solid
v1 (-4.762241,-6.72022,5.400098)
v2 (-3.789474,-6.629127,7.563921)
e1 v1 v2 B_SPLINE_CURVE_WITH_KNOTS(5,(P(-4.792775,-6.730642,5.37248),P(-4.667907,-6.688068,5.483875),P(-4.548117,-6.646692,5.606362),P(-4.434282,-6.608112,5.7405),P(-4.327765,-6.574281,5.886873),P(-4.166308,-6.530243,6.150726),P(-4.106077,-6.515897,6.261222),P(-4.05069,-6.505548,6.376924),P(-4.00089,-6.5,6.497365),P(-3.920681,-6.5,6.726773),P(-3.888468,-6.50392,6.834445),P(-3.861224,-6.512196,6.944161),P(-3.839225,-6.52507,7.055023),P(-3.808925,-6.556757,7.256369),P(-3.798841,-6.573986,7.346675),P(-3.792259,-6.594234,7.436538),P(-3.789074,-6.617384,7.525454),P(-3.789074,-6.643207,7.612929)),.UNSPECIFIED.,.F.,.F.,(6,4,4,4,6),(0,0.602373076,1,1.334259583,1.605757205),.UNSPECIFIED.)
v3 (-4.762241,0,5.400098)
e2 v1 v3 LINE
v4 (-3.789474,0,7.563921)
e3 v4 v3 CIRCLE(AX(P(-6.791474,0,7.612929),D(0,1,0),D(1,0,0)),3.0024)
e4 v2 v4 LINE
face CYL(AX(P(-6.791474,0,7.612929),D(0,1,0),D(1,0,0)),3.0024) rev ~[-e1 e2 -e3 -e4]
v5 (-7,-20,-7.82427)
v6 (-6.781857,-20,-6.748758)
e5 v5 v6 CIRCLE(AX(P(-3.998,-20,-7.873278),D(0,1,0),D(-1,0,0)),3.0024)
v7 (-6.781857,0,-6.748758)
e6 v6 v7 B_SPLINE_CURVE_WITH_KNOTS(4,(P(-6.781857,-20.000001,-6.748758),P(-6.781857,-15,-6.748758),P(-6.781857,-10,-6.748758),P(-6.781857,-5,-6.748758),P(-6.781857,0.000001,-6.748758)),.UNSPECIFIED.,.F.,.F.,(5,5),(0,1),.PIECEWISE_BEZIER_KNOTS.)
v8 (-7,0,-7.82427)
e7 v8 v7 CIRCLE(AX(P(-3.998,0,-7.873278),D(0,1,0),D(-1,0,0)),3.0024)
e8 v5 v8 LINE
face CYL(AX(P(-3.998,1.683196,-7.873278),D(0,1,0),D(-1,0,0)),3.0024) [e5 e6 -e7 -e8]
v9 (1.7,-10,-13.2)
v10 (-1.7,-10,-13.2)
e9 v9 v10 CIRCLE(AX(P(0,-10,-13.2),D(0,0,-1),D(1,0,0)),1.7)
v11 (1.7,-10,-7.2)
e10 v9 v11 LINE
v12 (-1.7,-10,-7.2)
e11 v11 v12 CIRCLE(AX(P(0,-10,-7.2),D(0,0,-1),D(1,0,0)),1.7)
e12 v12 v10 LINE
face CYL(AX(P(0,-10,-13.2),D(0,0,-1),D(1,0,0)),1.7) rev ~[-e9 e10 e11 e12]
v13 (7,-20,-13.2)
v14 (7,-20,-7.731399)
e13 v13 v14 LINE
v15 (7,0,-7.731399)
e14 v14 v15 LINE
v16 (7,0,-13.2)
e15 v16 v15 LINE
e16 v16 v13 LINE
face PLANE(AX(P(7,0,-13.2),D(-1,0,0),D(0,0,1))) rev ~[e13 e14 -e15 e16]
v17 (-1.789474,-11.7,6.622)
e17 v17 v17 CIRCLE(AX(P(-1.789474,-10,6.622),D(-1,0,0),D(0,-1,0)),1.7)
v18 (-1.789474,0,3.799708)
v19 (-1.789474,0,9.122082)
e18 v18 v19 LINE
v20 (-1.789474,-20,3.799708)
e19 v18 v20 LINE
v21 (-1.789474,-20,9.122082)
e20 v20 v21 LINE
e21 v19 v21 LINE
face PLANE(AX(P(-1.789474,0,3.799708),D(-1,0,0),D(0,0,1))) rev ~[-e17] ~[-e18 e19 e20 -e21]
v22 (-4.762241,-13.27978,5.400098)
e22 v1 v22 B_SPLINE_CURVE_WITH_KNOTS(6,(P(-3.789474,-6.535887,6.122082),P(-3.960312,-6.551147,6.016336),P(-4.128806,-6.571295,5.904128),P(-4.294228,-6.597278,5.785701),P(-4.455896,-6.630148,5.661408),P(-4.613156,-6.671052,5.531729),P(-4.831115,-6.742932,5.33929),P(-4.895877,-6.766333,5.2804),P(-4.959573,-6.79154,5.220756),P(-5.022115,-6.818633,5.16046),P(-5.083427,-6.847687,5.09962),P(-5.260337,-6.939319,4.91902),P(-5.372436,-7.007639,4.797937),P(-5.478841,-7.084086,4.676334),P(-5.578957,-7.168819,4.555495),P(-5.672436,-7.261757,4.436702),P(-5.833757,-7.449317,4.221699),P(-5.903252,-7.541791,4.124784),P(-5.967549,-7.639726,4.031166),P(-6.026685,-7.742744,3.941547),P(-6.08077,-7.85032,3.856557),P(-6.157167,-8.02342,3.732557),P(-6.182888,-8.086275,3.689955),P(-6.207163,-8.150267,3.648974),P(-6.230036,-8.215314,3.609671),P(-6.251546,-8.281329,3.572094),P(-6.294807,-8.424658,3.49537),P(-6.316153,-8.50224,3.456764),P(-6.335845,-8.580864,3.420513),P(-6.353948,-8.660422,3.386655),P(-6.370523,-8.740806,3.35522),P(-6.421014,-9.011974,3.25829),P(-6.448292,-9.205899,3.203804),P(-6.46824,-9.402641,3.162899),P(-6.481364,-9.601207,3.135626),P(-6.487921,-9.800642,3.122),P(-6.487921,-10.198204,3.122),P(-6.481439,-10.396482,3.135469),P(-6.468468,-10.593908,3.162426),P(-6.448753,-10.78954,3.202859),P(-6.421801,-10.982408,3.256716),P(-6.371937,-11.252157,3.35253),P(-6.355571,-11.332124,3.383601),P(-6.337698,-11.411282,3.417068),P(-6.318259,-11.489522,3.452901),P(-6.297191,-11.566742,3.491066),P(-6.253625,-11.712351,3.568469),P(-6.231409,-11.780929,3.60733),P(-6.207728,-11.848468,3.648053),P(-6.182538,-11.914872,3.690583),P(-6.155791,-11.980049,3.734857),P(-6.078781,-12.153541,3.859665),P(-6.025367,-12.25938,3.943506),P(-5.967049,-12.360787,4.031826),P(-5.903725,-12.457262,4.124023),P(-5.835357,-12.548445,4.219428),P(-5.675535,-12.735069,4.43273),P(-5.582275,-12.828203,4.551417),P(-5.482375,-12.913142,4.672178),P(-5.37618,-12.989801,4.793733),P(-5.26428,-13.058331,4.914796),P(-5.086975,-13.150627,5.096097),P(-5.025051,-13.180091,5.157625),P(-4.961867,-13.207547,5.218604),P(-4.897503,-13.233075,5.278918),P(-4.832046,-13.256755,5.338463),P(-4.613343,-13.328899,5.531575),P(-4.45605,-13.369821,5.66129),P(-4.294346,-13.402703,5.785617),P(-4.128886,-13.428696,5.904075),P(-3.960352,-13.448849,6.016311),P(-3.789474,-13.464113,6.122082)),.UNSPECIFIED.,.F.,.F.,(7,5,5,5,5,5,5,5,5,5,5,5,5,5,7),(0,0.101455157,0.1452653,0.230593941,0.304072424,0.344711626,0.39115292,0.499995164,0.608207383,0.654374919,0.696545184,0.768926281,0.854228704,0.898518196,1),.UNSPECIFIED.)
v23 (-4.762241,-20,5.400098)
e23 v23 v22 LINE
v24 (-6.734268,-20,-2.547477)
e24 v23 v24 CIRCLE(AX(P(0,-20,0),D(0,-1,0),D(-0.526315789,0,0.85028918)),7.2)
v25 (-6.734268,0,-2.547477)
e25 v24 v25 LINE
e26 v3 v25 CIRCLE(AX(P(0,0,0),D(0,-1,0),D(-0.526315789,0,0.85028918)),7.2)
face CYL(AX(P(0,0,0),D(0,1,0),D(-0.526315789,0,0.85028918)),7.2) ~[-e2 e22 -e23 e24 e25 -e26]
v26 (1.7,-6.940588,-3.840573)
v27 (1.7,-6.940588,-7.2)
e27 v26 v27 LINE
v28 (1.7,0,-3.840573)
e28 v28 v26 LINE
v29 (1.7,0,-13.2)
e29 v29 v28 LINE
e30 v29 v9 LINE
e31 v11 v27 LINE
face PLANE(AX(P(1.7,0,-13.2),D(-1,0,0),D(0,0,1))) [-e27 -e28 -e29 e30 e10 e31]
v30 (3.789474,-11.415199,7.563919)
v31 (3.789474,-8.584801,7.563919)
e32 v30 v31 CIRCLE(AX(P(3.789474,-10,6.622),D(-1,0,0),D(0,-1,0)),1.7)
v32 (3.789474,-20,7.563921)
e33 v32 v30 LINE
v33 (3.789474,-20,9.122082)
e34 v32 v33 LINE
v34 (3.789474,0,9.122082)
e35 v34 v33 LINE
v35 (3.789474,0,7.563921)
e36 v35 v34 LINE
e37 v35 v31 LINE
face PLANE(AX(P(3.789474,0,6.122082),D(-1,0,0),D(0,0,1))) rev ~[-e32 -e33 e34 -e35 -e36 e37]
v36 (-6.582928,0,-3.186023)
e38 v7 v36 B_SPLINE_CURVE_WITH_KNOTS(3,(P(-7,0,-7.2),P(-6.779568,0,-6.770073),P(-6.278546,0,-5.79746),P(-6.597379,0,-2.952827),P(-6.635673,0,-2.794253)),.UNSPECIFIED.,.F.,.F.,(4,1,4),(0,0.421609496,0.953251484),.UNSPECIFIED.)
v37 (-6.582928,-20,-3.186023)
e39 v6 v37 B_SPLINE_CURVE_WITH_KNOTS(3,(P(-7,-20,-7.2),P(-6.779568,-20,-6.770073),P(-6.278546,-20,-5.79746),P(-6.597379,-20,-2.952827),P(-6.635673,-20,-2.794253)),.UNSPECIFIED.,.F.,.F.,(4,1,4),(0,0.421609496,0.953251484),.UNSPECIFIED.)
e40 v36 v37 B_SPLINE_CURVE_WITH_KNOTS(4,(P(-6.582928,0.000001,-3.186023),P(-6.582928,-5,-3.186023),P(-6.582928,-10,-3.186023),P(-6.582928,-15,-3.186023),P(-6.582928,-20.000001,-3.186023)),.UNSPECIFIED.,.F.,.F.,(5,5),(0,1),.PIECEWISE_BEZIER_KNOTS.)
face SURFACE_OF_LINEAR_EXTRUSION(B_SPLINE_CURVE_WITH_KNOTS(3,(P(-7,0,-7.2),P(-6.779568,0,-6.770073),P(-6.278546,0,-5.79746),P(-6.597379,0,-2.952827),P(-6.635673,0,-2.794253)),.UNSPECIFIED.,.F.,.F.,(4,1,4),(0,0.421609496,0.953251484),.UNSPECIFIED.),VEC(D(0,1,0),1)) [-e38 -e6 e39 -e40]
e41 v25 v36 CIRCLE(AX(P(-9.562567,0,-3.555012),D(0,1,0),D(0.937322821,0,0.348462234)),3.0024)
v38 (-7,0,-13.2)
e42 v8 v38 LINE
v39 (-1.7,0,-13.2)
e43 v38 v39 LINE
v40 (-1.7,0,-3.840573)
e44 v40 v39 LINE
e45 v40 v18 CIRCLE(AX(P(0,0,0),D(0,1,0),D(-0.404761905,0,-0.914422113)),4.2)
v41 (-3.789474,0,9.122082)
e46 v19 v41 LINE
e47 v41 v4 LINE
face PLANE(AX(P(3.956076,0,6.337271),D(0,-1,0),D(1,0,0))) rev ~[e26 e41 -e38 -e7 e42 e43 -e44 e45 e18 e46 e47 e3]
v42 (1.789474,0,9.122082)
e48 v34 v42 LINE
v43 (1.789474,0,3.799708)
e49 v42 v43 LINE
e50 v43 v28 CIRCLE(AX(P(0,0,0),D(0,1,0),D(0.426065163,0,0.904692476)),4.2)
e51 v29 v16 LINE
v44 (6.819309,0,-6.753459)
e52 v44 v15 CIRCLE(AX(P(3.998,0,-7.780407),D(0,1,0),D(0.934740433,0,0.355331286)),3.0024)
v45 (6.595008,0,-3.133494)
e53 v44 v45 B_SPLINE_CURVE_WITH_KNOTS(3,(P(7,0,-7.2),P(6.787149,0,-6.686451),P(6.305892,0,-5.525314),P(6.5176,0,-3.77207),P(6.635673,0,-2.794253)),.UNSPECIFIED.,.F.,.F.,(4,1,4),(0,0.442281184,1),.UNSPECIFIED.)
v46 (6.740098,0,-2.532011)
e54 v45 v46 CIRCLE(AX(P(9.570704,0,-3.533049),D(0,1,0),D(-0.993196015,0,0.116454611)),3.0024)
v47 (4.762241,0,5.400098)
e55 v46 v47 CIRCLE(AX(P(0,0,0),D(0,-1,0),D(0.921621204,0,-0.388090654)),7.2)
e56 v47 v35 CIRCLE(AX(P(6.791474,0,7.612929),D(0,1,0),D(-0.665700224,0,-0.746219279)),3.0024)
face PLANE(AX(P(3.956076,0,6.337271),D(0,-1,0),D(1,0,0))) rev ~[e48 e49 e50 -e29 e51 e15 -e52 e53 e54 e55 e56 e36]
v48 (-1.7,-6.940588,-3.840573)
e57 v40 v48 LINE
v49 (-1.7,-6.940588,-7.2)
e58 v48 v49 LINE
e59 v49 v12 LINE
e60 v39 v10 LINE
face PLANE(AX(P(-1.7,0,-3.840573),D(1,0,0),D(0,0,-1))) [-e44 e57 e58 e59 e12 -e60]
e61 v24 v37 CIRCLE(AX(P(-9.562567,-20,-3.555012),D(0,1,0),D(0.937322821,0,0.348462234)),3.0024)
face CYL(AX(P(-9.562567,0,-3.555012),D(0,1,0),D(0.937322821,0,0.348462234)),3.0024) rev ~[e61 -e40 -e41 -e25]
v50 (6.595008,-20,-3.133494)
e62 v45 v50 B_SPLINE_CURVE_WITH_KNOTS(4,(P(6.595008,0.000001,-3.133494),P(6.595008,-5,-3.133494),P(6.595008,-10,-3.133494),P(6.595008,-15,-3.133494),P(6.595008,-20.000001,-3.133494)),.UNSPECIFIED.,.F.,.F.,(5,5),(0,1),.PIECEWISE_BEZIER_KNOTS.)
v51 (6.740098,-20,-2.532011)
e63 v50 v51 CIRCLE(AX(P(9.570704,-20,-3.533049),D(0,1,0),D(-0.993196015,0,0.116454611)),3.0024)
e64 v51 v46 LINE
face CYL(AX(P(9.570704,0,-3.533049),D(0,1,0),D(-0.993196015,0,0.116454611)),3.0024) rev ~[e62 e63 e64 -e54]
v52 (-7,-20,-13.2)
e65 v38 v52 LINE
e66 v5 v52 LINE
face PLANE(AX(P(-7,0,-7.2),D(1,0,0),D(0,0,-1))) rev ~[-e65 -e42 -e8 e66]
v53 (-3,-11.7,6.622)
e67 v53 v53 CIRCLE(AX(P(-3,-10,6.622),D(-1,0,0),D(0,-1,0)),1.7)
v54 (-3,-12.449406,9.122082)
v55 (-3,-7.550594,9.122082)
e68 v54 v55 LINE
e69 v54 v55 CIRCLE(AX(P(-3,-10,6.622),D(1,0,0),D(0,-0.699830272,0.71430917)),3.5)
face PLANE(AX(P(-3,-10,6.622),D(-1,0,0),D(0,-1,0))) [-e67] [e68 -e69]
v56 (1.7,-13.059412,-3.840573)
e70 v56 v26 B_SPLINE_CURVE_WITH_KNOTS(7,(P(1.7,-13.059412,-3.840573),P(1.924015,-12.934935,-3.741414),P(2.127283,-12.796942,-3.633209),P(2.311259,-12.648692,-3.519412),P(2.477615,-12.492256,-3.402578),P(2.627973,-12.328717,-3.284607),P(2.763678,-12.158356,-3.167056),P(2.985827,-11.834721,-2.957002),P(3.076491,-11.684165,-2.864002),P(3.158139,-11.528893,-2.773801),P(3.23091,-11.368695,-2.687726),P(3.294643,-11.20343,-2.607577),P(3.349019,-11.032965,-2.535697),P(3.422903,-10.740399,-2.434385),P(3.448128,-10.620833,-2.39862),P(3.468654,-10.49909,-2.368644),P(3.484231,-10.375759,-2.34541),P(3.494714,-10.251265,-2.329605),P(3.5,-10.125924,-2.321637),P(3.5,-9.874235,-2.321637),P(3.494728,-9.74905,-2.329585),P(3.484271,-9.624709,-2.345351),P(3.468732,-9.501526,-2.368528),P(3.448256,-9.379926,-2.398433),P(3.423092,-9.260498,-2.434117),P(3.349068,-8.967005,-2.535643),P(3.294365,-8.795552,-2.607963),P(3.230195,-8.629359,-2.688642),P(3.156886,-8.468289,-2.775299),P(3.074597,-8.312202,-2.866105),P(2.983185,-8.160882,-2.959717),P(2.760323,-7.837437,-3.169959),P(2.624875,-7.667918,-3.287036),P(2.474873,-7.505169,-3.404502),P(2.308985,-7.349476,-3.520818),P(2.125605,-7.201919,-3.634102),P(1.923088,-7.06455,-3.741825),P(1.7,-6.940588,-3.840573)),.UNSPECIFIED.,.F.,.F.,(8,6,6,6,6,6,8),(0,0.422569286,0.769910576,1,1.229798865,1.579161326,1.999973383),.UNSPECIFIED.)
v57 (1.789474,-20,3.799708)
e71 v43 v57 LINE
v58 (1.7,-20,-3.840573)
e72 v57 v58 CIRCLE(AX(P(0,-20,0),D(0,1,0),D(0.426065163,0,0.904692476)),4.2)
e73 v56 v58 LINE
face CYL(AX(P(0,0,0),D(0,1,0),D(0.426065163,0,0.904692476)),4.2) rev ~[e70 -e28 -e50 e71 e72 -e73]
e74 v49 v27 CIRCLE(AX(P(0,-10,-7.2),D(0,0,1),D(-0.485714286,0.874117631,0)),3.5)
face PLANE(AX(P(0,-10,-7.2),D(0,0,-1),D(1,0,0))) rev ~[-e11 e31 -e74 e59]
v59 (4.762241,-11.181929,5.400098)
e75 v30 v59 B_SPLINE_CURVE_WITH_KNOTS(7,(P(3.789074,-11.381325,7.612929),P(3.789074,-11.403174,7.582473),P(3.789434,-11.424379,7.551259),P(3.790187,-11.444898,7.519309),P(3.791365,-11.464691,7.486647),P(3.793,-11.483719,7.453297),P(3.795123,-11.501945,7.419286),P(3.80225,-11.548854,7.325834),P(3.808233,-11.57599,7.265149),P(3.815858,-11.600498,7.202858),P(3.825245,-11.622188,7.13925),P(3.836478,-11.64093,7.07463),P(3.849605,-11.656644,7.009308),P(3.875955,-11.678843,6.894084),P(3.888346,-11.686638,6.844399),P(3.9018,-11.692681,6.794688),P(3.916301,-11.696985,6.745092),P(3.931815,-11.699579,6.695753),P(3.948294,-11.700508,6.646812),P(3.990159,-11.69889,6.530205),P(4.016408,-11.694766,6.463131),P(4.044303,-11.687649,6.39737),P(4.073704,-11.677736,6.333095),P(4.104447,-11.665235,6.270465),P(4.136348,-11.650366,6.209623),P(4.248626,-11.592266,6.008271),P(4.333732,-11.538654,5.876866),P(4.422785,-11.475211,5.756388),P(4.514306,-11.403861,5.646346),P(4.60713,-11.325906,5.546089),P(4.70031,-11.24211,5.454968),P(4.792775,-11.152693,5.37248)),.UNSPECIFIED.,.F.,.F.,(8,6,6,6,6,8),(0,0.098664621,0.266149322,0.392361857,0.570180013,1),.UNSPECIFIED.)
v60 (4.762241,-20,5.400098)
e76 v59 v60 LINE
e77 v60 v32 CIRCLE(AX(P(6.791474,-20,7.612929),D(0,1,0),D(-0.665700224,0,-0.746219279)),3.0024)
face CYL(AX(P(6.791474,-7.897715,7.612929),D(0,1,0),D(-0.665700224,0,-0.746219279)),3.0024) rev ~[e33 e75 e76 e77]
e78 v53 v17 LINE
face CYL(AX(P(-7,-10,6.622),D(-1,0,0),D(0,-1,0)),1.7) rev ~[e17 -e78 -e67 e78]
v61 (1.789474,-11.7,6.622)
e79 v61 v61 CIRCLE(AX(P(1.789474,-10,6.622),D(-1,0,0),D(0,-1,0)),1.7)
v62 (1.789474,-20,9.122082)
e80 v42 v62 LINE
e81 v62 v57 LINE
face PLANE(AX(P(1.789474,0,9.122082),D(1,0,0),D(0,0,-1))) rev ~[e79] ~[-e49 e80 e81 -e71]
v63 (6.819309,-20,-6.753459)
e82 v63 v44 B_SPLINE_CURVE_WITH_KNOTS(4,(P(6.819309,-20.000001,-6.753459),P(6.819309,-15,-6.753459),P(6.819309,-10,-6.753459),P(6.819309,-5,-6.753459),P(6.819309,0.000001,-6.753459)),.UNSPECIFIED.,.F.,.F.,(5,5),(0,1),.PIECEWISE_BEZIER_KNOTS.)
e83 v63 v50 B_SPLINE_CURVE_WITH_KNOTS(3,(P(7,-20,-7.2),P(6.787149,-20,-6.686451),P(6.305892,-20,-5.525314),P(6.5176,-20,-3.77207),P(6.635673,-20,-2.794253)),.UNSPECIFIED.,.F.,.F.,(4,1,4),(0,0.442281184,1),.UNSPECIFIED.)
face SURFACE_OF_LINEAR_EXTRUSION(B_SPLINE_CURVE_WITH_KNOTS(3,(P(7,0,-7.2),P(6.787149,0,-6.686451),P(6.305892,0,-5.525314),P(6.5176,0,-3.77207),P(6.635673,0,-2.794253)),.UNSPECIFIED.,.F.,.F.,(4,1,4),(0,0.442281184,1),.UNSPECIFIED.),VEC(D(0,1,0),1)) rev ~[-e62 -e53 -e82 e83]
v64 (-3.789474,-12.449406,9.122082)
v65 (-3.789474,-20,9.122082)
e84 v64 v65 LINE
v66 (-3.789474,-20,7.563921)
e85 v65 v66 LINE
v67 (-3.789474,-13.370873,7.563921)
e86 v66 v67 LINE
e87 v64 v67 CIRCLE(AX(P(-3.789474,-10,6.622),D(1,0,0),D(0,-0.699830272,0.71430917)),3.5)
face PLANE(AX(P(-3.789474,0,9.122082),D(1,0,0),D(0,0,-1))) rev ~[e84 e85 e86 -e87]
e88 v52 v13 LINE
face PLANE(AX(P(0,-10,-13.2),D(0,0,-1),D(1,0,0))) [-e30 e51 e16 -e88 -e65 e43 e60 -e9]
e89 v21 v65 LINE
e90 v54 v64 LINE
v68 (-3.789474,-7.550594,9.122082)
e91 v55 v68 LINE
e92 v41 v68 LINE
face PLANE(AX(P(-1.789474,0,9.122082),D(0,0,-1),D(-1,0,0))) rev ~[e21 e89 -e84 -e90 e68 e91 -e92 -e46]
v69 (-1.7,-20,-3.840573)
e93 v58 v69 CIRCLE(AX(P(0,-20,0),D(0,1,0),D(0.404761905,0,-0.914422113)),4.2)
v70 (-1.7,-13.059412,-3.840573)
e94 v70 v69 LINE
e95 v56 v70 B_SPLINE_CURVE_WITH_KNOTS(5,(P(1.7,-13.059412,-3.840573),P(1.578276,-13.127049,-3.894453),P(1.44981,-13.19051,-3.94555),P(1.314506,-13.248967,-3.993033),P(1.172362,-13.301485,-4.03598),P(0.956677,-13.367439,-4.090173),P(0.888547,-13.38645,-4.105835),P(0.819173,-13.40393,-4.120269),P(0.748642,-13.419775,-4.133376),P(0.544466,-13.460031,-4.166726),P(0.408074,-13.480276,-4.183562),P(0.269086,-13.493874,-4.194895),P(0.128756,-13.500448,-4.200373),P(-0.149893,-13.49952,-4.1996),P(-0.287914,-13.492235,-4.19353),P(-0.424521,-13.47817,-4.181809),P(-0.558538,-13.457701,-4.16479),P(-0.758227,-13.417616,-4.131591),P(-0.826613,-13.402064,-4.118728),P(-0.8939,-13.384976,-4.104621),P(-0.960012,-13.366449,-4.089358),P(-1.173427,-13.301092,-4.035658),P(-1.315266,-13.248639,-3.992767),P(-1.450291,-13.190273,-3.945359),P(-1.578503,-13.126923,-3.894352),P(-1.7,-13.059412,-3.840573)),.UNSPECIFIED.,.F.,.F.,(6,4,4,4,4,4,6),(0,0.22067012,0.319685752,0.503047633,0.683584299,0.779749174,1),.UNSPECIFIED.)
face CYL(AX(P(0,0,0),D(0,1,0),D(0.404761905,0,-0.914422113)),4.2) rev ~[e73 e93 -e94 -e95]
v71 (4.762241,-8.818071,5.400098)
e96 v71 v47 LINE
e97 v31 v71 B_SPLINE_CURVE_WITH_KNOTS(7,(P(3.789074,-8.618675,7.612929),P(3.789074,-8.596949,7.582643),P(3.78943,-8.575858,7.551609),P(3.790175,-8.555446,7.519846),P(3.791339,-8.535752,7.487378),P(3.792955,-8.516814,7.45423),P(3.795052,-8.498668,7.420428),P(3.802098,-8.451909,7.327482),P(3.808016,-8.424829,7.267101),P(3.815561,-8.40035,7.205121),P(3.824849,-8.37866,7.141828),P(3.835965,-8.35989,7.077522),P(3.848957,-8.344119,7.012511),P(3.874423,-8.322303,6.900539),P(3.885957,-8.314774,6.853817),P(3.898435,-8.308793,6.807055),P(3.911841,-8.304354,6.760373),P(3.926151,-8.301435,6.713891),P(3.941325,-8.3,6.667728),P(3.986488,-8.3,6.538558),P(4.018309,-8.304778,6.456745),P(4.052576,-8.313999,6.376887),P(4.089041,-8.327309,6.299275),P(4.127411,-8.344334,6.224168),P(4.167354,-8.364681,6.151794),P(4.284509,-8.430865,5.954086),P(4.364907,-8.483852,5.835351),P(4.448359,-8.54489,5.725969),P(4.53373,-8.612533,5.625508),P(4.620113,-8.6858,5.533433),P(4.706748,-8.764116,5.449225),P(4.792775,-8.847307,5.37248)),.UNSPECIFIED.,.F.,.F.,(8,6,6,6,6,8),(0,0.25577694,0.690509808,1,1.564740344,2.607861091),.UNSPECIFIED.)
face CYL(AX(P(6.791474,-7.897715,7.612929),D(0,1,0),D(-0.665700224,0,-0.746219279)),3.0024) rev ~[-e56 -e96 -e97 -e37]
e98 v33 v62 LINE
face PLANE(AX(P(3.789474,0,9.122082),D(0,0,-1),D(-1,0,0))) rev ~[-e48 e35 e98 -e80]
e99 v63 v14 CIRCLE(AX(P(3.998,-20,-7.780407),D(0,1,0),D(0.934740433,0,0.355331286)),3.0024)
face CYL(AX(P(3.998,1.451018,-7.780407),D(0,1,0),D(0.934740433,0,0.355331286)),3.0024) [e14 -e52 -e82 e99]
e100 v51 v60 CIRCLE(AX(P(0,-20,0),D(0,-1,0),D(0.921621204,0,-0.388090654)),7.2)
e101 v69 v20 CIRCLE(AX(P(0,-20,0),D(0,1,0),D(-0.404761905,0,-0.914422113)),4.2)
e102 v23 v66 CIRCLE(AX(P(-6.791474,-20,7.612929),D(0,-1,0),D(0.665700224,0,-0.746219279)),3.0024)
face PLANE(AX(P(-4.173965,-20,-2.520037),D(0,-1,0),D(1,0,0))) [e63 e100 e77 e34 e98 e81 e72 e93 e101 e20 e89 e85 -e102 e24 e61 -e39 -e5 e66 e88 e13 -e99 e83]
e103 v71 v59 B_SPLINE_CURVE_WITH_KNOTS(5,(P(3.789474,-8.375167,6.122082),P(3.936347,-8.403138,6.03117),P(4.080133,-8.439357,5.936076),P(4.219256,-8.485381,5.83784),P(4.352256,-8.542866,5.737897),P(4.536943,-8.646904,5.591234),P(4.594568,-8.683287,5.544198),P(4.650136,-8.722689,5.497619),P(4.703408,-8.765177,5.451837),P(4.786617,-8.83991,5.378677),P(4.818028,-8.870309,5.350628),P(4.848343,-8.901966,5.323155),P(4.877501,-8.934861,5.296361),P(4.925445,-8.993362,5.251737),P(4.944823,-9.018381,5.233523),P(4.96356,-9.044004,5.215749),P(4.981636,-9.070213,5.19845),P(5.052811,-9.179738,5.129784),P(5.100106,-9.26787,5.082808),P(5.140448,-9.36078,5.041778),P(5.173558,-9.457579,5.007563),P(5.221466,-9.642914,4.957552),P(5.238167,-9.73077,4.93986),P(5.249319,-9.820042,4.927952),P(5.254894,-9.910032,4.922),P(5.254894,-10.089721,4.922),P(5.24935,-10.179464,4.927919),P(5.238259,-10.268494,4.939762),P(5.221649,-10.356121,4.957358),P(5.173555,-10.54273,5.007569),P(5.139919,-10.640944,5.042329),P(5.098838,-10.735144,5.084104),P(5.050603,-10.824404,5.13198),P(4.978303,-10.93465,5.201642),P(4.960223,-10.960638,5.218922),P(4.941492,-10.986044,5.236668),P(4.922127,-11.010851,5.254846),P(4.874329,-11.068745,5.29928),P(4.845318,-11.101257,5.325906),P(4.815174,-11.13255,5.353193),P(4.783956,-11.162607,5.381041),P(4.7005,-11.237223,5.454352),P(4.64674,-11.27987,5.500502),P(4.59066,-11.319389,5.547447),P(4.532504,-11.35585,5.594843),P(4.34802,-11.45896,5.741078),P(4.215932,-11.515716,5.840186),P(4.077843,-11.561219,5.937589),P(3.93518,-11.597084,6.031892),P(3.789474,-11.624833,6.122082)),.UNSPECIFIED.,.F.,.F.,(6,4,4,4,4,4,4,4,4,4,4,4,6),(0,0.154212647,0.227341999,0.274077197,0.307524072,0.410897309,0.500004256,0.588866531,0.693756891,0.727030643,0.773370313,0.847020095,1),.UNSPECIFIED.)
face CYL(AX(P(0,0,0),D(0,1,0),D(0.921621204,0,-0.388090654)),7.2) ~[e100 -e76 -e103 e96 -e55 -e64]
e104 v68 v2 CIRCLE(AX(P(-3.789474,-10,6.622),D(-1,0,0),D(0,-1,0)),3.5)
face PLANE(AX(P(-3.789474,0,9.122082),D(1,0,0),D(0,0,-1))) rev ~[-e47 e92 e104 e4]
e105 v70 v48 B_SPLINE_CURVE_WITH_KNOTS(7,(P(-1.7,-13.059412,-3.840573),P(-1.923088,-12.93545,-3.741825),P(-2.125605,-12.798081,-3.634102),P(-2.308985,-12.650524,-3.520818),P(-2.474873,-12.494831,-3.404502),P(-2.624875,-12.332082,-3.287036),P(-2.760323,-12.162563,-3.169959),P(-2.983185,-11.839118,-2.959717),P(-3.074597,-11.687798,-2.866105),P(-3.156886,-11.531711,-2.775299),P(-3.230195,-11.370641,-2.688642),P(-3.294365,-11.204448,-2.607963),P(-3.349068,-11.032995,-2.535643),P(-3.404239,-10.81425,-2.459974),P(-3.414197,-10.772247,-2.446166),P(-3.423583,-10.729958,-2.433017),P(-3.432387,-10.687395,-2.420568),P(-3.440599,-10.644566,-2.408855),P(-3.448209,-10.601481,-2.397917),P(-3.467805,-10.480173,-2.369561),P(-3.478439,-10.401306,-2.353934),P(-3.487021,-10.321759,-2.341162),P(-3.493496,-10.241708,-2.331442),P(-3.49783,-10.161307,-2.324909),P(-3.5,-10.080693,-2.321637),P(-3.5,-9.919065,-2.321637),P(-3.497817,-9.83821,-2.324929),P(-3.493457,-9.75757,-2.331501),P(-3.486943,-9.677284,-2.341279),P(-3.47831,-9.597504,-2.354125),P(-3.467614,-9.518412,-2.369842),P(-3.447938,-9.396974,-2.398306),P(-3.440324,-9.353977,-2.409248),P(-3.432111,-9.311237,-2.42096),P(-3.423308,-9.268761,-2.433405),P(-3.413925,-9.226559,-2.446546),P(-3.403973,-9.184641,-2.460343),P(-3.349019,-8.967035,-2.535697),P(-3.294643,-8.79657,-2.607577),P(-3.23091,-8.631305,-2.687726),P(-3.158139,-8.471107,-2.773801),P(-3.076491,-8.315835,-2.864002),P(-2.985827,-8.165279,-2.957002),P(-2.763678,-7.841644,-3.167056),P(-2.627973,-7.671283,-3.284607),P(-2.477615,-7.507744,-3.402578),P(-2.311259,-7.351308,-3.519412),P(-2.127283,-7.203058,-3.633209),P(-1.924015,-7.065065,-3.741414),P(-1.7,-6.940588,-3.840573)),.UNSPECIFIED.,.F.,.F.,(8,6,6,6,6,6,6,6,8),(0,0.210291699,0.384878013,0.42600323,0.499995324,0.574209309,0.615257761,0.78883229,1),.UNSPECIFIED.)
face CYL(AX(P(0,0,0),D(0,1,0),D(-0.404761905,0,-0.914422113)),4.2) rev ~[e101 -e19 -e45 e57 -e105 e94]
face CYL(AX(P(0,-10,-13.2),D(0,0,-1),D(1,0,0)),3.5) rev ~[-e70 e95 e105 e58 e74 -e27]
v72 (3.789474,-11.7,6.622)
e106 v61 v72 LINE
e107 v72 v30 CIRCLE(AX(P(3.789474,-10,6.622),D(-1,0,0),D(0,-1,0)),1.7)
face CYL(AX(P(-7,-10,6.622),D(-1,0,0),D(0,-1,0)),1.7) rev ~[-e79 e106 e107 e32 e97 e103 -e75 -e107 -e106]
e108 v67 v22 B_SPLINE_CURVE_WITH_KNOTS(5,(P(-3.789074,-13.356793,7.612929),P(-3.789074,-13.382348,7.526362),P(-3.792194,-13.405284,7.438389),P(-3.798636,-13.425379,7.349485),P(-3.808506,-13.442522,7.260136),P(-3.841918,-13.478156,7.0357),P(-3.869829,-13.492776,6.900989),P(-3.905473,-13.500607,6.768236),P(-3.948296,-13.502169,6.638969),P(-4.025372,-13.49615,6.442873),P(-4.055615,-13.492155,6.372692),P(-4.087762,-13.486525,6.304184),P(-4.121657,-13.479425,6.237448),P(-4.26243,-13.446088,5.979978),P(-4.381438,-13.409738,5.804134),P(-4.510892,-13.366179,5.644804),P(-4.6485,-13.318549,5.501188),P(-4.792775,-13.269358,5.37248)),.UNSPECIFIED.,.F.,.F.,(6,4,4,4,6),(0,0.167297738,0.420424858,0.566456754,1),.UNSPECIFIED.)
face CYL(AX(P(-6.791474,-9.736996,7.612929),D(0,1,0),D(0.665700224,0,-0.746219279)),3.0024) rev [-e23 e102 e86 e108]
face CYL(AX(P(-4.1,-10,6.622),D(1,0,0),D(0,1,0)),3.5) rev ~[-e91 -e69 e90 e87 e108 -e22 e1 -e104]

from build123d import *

# Parameters (mm, degrees)
F1_DEPTH     = 20
F2_R         = 3.5
F2_R_2       = 1.7
F3_DEPTH     = 4
F4_DEPTH     = 25
F5_T1_DEPTH  = 20
F5_T6_DEPTH  = 12.1022846539
F5_S7_R      = 1.7
F5_T8_DEPTH  = 8
F5_T12_DEPTH = 12.1022846539
F5_S13_R     = 1.7
F5_T14_DEPTH = 8
F5_T18_DEPTH = 10.2630041323
F5_S19_R     = 3.5
F5_T20_DEPTH = 7
F5_T24_DEPTH = 10.2630041323
F5_S25_R     = 3.5
F5_T26_DEPTH = 7
F5_T27_DEPTH = 23.3663915102
F5_T29_DEPTH = 22.9020360067
F6_R         = 3.5
F6_R_2       = 1.7
F7_DEPTH     = 12
F8_DEPTH     = 12
F9_DEPTH     = 6
F10_DEPTH    = 10


# Not quite as in the source:
# - a fillet or chamfer that OpenCascade refuses, or shapes differently, is made with other operations: its cross-section is extruded or revolved along the edge and cut away or added


with BuildPart() as f1:
    # F0 (on Front) → F1 (new body)
    with BuildSketch(Plane.XZ):
        with BuildLine():
            ThreePointArc((-1.7, -3.8405728739), (-4.1997120304, -0.0491819207), (-1.7894736842, 3.7997084011))
            Line((-1.7894736842, 3.7997084011), (-1.7894736842, 9.1220820965))
            Line((-1.7894736842, 9.1220820965), (-3.7894736842, 9.1220820965))
            Line((-3.7894736842, 9.1220820965), (-3.7894736842, 6.1220820965))
            ThreePointArc((-3.7894736842, 6.1220820965), (-6.8557776995, 2.199616361), (-6.6439040907, -2.7746240166))
            add(Edge.make_bspline(
                [(-6.6356726702, -2.7942527112), (-6.6390399212, -2.7803089062), (-6.6413283577, -2.7774058988), (-6.6439040907, -2.7746240166)],
                knots=[0.9532514843, 0.9532514843, 0.9532514843, 0.9532514843, 1, 1, 1, 1], degree=3))
            add(Edge.make_bspline(
                [(-7, -7.2), (-6.7795680226, -6.7700727801), (-6.2785456929, -5.7974600377), (-6.5973790049, -2.9528269921), (-6.6356726702, -2.7942527112)],
                knots=[0, 0, 0, 0, 0.4216094964, 0.9532514843, 0.9532514843, 0.9532514843, 0.9532514843], degree=3))
            Line((-7, -7.2), (-7, -13.2))
            Line((-7, -13.2), (-1.7, -13.2))
            Line((-1.7, -13.2), (-1.7, -4.2))
            Line((-1.7, -4.2), (-1.7, -3.8405728739))
        make_face()
        with BuildLine():
            ThreePointArc((1.7, -3.8405728739), (0, -4.2), (-1.7, -3.8405728739))
            Line((-1.7, -3.8405728739), (-1.7, -4.2))
            Line((-1.7, -4.2), (-1.7, -13.2))
            Line((-1.7, -13.2), (1.7, -13.2))
            Line((1.7, -13.2), (1.7, -4.2))
            Line((1.7, -4.2), (1.7, -3.8405728739))
        make_face()
        with BuildLine():
            ThreePointArc((1.7894736842, 3.7997084011), (4.1997120304, -0.0491819207), (1.7, -3.8405728739))
            Line((1.7, -3.8405728739), (1.7, -4.2))
            Line((1.7, -4.2), (1.7, -13.2))
            Line((1.7, -13.2), (7, -13.2))
            Line((7, -13.2), (7, -7.2))
            add(Edge.make_bspline(
                [(7, -7.2), (6.7871491537, -6.6864508711), (6.3058923114, -5.5253136877), (6.5175995563, -3.7720698099), (6.6356726702, -2.7942527112)],
                knots=[0, 0, 0, 0, 0.4422811845, 1, 1, 1, 1], degree=3))
            ThreePointArc((6.6356726702, -2.7942527112), (6.8590214848, 2.1894803656), (3.7894736842, 6.1220820965))
            Line((3.7894736842, 6.1220820965), (3.7894736842, 9.1220820965))
            Line((3.7894736842, 9.1220820965), (1.7894736842, 9.1220820965))
            Line((1.7894736842, 9.1220820965), (1.7894736842, 3.7997084011))
        make_face()
        with BuildLine():
            add(Edge.make_bspline(
                [(-6.6356726702, -2.7942527112), (-6.6390399212, -2.7803089062), (-6.6413283577, -2.7774058988), (-6.6439040907, -2.7746240166)],
                knots=[0.9532514843, 0.9532514843, 0.9532514843, 0.9532514843, 1, 1, 1, 1], degree=3))
            ThreePointArc((-6.6439040907, -2.7746240166), (-6.6397956338, -2.7844414056), (-6.6356726702, -2.7942527112))
        make_face()
    extrude(amount=F1_DEPTH)

    # F2 (on face) → F3 (cut)
    with BuildSketch(Plane(origin=(-7, 0, 0), x_dir=(0, -1, 0), z_dir=(-1, 0, 0))):
        with Locations((10, 6.622)):
            Circle(F2_R)
        with Locations((10, 6.622)):
            Circle(F2_R_2, mode=Mode.SUBTRACT)
    extrude(amount=-F3_DEPTH, mode=Mode.SUBTRACT)

    # F2 (on face) → F4 (cut)
    with BuildSketch(Plane(origin=(-7, 0, 0), x_dir=(0, -1, 0), z_dir=(-1, 0, 0))):
        with Locations((10, 6.622)):
            Circle(F2_R_2)
    extrude(amount=-F4_DEPTH, mode=Mode.SUBTRACT)

    # F5: fillet of radius 3 on 8 edges, made by hand

    # F5_s2 → F5_t1 (join)
    with BuildSketch(Plane.XZ):
        with BuildLine():
            ThreePointArc((-6.7483493849, -2.5087886996), (-6.6395606645, -2.8691274316), (-6.5767127025, -3.2402461743))
            Line((-6.5767127025, -3.2402461743), (-6.2781272304, -3.2087696206))
            ThreePointArc((-6.2781272304, -3.2087696206), (-6.304537605, -2.9799785061), (-6.343821894, -2.723774473))
            Line((-6.343821894, -2.723774473), (-6.3589651198, -2.6777323732))
            ThreePointArc((-6.3589651198, -2.6777323732), (-6.4145893512, -2.5416001874), (-6.466927581, -2.4041663985))
            Line((-6.466927581, -2.4041663985), (-6.7483493849, -2.5087886996))
        make_face()
        with BuildLine():
            ThreePointArc((6.5887317904, -3.1834061265), (6.6509501418, -2.8334452349), (6.754091056, -2.4932898281))
            Line((6.754091056, -2.4932898281), (6.4724298111, -2.3893138658))
            ThreePointArc((6.4724298111, -2.3893138658), (6.4175024363, -2.534235691), (6.3589651198, -2.6777323732))
            Line((6.3589651198, -2.6777323732), (6.3375979172, -2.7582596669))
            ThreePointArc((6.3375979172, -2.7582596669), (6.3141276632, -2.9530960278), (6.290534619, -3.1484417941))
            Line((6.290534619, -3.1484417941), (6.5887317904, -3.1834061265))
        make_face()
    extrude(amount=F5_T1_DEPTH)


with BuildPart() as f5_tool4:
    # F5_s5 → F5_t6 (new body)
    with BuildSketch(Plane.XZ.offset(7.8977153461)):
        with BuildLine():
            ThreePointArc((4.792775332, 5.3724803189), (4.0514647707, 6.385428811), (3.7890736842, 7.6129290813))
            Line((3.7890736842, 7.6129290813), (3.4888336842, 7.6129290813))
            ThreePointArc((3.4888336842, 7.6129290813), (3.4892336842, 6.8675055889), (3.4892336842, 6.1220820965))
            Line((3.4892336842, 6.1220820965), (3.6314526316, 5.8667912731))
            ThreePointArc((3.6314526316, 5.8667912731), (4.1279416848, 5.5287236777), (4.5929054968, 5.1484354427))
            Line((4.5929054968, 5.1484354427), (4.792775332, 5.3724803189))
        make_face()
    extrude(amount=F5_T6_DEPTH)

    # F5_s7 → F5_t8 (cut, symmetric)
    with BuildSketch(Plane.YZ.offset(4.1)):
        with Locations((-10, 6.622)):
            Circle(F5_S7_R)
    extrude(amount=F5_T8_DEPTH, both=True, mode=Mode.SUBTRACT)


with BuildPart() as f1_1:
    add(f1.part)

    # F5_t3: union F5_tool4
    add(f5_tool4.part)


with BuildPart() as f5_tool10:
    # F5_s11 → F5_t12 (new body)
    with BuildSketch(Plane.XZ):
        with BuildLine():
            ThreePointArc((4.792775332, 5.3724803189), (4.0514647707, 6.385428811), (3.7890736842, 7.6129290813))
            Line((3.7890736842, 7.6129290813), (3.4888336842, 7.6129290813))
            ThreePointArc((3.4888336842, 7.6129290813), (3.4892336842, 6.8675055889), (3.4892336842, 6.1220820965))
            Line((3.4892336842, 6.1220820965), (3.6314526316, 5.8667912731))
            ThreePointArc((3.6314526316, 5.8667912731), (4.1279416848, 5.5287236777), (4.5929054968, 5.1484354427))
            Line((4.5929054968, 5.1484354427), (4.792775332, 5.3724803189))
        make_face()
    extrude(amount=F5_T12_DEPTH)

    # F5_s13 → F5_t14 (cut, symmetric)
    with BuildSketch(Plane.YZ.offset(4.1)):
        with Locations((-10, 6.622)):
            Circle(F5_S13_R)
    extrude(amount=F5_T14_DEPTH, both=True, mode=Mode.SUBTRACT)


with BuildPart() as f1_2:
    add(f1_1.part)

    # F5_t9: union F5_tool10
    add(f5_tool10.part)


with BuildPart() as f5_tool16:
    # F5_s17 → F5_t18 (new body)
    with BuildSketch(Plane.XZ):
        with BuildLine():
            ThreePointArc((-3.7890736842, 7.6129290813), (-4.0514647707, 6.385428811), (-4.792775332, 5.3724803189))
            Line((-4.792775332, 5.3724803189), (-4.5929054968, 5.1484354427))
            ThreePointArc((-4.5929054968, 5.1484354427), (-4.1279416848, 5.5287236777), (-3.6314526316, 5.8667912731))
            Line((-3.6314526316, 5.8667912731), (-3.4892336842, 6.1220820965))
            ThreePointArc((-3.4892336842, 6.1220820965), (-3.4892336842, 6.8675055889), (-3.4888336842, 7.6129290813))
            Line((-3.4888336842, 7.6129290813), (-3.7890736842, 7.6129290813))
        make_face()
    extrude(amount=F5_T18_DEPTH)

    # F5_s19 → F5_t20 (cut, symmetric)
    with BuildSketch(Plane.YZ.offset(-4.1)):
        with Locations((-10, 6.622)):
            Circle(F5_S19_R)
    extrude(amount=F5_T20_DEPTH, both=True, mode=Mode.SUBTRACT)


with BuildPart() as f1_3:
    add(f1_2.part)

    # F5_t15: union F5_tool16
    add(f5_tool16.part)


with BuildPart() as f5_tool22:
    # F5_s23 → F5_t24 (new body)
    with BuildSketch(Plane.XZ.offset(9.7369958677)):
        with BuildLine():
            ThreePointArc((-4.792775332, 5.3724803189), (-4.0514647707, 6.385428811), (-3.7890736842, 7.6129290813))
            Line((-3.7890736842, 7.6129290813), (-3.4888336842, 7.6129290813))
            ThreePointArc((-3.4888336842, 7.6129290813), (-3.4892336842, 6.8675055889), (-3.4892336842, 6.1220820965))
            Line((-3.4892336842, 6.1220820965), (-3.6314526316, 5.8667912731))
            ThreePointArc((-3.6314526316, 5.8667912731), (-4.1279416848, 5.5287236777), (-4.5929054968, 5.1484354427))
            Line((-4.5929054968, 5.1484354427), (-4.792775332, 5.3724803189))
        make_face()
    extrude(amount=F5_T24_DEPTH)

    # F5_s25 → F5_t26 (cut, symmetric)
    with BuildSketch(Plane.YZ.offset(-4.1)):
        with Locations((-10, 6.622)):
            Circle(F5_S25_R)
    extrude(amount=F5_T26_DEPTH, both=True, mode=Mode.SUBTRACT)


with BuildPart() as f1_4:
    add(f1_3.part)

    # F5_t21: union F5_tool22
    add(f5_tool22.part)

    # F5_s28 → F5_t27 (cut)
    with BuildSketch(Plane.XZ.offset(-1.6831957551)):
        with BuildLine():
            ThreePointArc((-7.0004, -7.8732781832), (-6.9416848839, -7.2824101234), (-6.7678360085, -6.7146521667))
            Line((-6.7678360085, -6.7146521667), (-7.0448196093, -6.5987895651))
            ThreePointArc((-7.0448196093, -6.5987895651), (-7.148871707, -6.8283644641), (-7.2671697753, -7.0630169034))
            Line((-7.2671697753, -7.0630169034), (-7.30024, -7.2))
            ThreePointArc((-7.30024, -7.2), (-7.30024, -7.5366390916), (-7.30064, -7.8732781832))
            Line((-7.30064, -7.8732781832), (-7.0004, -7.8732781832))
        make_face()
    extrude(amount=F5_T27_DEPTH, mode=Mode.SUBTRACT)

    # F5_s30 → F5_t29 (cut)
    with BuildSketch(Plane.XZ.offset(-1.4510180034)):
        with BuildLine():
            ThreePointArc((6.8044646756, -6.7135604089), (6.9510099307, -7.2380620544), (7.0004, -7.7804070635))
            Line((7.0004, -7.7804070635), (7.30064, -7.7804070635))
            ThreePointArc((7.30064, -7.7804070635), (7.30024, -7.4902035318), (7.30024, -7.2))
            Line((7.30024, -7.2), (7.277360411, -7.0850423555))
            ThreePointArc((7.277360411, -7.0850423555), (7.178454263, -6.8447161783), (7.0851111432, -6.6068757434))
            Line((7.0851111432, -6.6068757434), (6.8044646756, -6.7135604089))
        make_face()
    extrude(amount=F5_T29_DEPTH, mode=Mode.SUBTRACT)

    # F6 (on face) → F7 (cut)
    with BuildSketch(Plane(origin=(0, 0, -13.2), x_dir=(1, 0, 0), z_dir=(0, 0, -1))):
        with Locations((0, 10)):
            Circle(F6_R)
        with Locations((0, 10)):
            Circle(F6_R_2, mode=Mode.SUBTRACT)
    extrude(amount=-F7_DEPTH, mode=Mode.SUBTRACT)

    # F8 (cut): a face of the model
    f8_faces = [f1_4.faces().sort_by_distance(p)[0] for p in [
        (0, -10, -13.2),
    ]]
    extrude(f8_faces, amount=-F8_DEPTH, mode=Mode.SUBTRACT)

    # F6 (on face) → F9 (join)
    with BuildSketch(Plane(origin=(0, 0, -13.2), x_dir=(1, 0, 0), z_dir=(0, 0, -1))):
        with Locations((0, 10)):
            Circle(F6_R)
        with Locations((0, 10)):
            Circle(F6_R_2, mode=Mode.SUBTRACT)
    extrude(amount=-F9_DEPTH)

    # F0 (on Front) → F10 (cut)
    with BuildSketch(Plane.XZ):
        with BuildLine():
            ThreePointArc((1.7, -3.8405728739), (0, -4.2), (-1.7, -3.8405728739))
            Line((-1.7, -3.8405728739), (-1.7, -4.2))
            Line((-1.7, -4.2), (-1.7, -13.2))
            Line((-1.7, -13.2), (1.7, -13.2))
            Line((1.7, -13.2), (1.7, -4.2))
            Line((1.7, -4.2), (1.7, -3.8405728739))
        make_face()
    extrude(amount=F10_DEPTH, mode=Mode.SUBTRACT)


solid = f1_4.part
